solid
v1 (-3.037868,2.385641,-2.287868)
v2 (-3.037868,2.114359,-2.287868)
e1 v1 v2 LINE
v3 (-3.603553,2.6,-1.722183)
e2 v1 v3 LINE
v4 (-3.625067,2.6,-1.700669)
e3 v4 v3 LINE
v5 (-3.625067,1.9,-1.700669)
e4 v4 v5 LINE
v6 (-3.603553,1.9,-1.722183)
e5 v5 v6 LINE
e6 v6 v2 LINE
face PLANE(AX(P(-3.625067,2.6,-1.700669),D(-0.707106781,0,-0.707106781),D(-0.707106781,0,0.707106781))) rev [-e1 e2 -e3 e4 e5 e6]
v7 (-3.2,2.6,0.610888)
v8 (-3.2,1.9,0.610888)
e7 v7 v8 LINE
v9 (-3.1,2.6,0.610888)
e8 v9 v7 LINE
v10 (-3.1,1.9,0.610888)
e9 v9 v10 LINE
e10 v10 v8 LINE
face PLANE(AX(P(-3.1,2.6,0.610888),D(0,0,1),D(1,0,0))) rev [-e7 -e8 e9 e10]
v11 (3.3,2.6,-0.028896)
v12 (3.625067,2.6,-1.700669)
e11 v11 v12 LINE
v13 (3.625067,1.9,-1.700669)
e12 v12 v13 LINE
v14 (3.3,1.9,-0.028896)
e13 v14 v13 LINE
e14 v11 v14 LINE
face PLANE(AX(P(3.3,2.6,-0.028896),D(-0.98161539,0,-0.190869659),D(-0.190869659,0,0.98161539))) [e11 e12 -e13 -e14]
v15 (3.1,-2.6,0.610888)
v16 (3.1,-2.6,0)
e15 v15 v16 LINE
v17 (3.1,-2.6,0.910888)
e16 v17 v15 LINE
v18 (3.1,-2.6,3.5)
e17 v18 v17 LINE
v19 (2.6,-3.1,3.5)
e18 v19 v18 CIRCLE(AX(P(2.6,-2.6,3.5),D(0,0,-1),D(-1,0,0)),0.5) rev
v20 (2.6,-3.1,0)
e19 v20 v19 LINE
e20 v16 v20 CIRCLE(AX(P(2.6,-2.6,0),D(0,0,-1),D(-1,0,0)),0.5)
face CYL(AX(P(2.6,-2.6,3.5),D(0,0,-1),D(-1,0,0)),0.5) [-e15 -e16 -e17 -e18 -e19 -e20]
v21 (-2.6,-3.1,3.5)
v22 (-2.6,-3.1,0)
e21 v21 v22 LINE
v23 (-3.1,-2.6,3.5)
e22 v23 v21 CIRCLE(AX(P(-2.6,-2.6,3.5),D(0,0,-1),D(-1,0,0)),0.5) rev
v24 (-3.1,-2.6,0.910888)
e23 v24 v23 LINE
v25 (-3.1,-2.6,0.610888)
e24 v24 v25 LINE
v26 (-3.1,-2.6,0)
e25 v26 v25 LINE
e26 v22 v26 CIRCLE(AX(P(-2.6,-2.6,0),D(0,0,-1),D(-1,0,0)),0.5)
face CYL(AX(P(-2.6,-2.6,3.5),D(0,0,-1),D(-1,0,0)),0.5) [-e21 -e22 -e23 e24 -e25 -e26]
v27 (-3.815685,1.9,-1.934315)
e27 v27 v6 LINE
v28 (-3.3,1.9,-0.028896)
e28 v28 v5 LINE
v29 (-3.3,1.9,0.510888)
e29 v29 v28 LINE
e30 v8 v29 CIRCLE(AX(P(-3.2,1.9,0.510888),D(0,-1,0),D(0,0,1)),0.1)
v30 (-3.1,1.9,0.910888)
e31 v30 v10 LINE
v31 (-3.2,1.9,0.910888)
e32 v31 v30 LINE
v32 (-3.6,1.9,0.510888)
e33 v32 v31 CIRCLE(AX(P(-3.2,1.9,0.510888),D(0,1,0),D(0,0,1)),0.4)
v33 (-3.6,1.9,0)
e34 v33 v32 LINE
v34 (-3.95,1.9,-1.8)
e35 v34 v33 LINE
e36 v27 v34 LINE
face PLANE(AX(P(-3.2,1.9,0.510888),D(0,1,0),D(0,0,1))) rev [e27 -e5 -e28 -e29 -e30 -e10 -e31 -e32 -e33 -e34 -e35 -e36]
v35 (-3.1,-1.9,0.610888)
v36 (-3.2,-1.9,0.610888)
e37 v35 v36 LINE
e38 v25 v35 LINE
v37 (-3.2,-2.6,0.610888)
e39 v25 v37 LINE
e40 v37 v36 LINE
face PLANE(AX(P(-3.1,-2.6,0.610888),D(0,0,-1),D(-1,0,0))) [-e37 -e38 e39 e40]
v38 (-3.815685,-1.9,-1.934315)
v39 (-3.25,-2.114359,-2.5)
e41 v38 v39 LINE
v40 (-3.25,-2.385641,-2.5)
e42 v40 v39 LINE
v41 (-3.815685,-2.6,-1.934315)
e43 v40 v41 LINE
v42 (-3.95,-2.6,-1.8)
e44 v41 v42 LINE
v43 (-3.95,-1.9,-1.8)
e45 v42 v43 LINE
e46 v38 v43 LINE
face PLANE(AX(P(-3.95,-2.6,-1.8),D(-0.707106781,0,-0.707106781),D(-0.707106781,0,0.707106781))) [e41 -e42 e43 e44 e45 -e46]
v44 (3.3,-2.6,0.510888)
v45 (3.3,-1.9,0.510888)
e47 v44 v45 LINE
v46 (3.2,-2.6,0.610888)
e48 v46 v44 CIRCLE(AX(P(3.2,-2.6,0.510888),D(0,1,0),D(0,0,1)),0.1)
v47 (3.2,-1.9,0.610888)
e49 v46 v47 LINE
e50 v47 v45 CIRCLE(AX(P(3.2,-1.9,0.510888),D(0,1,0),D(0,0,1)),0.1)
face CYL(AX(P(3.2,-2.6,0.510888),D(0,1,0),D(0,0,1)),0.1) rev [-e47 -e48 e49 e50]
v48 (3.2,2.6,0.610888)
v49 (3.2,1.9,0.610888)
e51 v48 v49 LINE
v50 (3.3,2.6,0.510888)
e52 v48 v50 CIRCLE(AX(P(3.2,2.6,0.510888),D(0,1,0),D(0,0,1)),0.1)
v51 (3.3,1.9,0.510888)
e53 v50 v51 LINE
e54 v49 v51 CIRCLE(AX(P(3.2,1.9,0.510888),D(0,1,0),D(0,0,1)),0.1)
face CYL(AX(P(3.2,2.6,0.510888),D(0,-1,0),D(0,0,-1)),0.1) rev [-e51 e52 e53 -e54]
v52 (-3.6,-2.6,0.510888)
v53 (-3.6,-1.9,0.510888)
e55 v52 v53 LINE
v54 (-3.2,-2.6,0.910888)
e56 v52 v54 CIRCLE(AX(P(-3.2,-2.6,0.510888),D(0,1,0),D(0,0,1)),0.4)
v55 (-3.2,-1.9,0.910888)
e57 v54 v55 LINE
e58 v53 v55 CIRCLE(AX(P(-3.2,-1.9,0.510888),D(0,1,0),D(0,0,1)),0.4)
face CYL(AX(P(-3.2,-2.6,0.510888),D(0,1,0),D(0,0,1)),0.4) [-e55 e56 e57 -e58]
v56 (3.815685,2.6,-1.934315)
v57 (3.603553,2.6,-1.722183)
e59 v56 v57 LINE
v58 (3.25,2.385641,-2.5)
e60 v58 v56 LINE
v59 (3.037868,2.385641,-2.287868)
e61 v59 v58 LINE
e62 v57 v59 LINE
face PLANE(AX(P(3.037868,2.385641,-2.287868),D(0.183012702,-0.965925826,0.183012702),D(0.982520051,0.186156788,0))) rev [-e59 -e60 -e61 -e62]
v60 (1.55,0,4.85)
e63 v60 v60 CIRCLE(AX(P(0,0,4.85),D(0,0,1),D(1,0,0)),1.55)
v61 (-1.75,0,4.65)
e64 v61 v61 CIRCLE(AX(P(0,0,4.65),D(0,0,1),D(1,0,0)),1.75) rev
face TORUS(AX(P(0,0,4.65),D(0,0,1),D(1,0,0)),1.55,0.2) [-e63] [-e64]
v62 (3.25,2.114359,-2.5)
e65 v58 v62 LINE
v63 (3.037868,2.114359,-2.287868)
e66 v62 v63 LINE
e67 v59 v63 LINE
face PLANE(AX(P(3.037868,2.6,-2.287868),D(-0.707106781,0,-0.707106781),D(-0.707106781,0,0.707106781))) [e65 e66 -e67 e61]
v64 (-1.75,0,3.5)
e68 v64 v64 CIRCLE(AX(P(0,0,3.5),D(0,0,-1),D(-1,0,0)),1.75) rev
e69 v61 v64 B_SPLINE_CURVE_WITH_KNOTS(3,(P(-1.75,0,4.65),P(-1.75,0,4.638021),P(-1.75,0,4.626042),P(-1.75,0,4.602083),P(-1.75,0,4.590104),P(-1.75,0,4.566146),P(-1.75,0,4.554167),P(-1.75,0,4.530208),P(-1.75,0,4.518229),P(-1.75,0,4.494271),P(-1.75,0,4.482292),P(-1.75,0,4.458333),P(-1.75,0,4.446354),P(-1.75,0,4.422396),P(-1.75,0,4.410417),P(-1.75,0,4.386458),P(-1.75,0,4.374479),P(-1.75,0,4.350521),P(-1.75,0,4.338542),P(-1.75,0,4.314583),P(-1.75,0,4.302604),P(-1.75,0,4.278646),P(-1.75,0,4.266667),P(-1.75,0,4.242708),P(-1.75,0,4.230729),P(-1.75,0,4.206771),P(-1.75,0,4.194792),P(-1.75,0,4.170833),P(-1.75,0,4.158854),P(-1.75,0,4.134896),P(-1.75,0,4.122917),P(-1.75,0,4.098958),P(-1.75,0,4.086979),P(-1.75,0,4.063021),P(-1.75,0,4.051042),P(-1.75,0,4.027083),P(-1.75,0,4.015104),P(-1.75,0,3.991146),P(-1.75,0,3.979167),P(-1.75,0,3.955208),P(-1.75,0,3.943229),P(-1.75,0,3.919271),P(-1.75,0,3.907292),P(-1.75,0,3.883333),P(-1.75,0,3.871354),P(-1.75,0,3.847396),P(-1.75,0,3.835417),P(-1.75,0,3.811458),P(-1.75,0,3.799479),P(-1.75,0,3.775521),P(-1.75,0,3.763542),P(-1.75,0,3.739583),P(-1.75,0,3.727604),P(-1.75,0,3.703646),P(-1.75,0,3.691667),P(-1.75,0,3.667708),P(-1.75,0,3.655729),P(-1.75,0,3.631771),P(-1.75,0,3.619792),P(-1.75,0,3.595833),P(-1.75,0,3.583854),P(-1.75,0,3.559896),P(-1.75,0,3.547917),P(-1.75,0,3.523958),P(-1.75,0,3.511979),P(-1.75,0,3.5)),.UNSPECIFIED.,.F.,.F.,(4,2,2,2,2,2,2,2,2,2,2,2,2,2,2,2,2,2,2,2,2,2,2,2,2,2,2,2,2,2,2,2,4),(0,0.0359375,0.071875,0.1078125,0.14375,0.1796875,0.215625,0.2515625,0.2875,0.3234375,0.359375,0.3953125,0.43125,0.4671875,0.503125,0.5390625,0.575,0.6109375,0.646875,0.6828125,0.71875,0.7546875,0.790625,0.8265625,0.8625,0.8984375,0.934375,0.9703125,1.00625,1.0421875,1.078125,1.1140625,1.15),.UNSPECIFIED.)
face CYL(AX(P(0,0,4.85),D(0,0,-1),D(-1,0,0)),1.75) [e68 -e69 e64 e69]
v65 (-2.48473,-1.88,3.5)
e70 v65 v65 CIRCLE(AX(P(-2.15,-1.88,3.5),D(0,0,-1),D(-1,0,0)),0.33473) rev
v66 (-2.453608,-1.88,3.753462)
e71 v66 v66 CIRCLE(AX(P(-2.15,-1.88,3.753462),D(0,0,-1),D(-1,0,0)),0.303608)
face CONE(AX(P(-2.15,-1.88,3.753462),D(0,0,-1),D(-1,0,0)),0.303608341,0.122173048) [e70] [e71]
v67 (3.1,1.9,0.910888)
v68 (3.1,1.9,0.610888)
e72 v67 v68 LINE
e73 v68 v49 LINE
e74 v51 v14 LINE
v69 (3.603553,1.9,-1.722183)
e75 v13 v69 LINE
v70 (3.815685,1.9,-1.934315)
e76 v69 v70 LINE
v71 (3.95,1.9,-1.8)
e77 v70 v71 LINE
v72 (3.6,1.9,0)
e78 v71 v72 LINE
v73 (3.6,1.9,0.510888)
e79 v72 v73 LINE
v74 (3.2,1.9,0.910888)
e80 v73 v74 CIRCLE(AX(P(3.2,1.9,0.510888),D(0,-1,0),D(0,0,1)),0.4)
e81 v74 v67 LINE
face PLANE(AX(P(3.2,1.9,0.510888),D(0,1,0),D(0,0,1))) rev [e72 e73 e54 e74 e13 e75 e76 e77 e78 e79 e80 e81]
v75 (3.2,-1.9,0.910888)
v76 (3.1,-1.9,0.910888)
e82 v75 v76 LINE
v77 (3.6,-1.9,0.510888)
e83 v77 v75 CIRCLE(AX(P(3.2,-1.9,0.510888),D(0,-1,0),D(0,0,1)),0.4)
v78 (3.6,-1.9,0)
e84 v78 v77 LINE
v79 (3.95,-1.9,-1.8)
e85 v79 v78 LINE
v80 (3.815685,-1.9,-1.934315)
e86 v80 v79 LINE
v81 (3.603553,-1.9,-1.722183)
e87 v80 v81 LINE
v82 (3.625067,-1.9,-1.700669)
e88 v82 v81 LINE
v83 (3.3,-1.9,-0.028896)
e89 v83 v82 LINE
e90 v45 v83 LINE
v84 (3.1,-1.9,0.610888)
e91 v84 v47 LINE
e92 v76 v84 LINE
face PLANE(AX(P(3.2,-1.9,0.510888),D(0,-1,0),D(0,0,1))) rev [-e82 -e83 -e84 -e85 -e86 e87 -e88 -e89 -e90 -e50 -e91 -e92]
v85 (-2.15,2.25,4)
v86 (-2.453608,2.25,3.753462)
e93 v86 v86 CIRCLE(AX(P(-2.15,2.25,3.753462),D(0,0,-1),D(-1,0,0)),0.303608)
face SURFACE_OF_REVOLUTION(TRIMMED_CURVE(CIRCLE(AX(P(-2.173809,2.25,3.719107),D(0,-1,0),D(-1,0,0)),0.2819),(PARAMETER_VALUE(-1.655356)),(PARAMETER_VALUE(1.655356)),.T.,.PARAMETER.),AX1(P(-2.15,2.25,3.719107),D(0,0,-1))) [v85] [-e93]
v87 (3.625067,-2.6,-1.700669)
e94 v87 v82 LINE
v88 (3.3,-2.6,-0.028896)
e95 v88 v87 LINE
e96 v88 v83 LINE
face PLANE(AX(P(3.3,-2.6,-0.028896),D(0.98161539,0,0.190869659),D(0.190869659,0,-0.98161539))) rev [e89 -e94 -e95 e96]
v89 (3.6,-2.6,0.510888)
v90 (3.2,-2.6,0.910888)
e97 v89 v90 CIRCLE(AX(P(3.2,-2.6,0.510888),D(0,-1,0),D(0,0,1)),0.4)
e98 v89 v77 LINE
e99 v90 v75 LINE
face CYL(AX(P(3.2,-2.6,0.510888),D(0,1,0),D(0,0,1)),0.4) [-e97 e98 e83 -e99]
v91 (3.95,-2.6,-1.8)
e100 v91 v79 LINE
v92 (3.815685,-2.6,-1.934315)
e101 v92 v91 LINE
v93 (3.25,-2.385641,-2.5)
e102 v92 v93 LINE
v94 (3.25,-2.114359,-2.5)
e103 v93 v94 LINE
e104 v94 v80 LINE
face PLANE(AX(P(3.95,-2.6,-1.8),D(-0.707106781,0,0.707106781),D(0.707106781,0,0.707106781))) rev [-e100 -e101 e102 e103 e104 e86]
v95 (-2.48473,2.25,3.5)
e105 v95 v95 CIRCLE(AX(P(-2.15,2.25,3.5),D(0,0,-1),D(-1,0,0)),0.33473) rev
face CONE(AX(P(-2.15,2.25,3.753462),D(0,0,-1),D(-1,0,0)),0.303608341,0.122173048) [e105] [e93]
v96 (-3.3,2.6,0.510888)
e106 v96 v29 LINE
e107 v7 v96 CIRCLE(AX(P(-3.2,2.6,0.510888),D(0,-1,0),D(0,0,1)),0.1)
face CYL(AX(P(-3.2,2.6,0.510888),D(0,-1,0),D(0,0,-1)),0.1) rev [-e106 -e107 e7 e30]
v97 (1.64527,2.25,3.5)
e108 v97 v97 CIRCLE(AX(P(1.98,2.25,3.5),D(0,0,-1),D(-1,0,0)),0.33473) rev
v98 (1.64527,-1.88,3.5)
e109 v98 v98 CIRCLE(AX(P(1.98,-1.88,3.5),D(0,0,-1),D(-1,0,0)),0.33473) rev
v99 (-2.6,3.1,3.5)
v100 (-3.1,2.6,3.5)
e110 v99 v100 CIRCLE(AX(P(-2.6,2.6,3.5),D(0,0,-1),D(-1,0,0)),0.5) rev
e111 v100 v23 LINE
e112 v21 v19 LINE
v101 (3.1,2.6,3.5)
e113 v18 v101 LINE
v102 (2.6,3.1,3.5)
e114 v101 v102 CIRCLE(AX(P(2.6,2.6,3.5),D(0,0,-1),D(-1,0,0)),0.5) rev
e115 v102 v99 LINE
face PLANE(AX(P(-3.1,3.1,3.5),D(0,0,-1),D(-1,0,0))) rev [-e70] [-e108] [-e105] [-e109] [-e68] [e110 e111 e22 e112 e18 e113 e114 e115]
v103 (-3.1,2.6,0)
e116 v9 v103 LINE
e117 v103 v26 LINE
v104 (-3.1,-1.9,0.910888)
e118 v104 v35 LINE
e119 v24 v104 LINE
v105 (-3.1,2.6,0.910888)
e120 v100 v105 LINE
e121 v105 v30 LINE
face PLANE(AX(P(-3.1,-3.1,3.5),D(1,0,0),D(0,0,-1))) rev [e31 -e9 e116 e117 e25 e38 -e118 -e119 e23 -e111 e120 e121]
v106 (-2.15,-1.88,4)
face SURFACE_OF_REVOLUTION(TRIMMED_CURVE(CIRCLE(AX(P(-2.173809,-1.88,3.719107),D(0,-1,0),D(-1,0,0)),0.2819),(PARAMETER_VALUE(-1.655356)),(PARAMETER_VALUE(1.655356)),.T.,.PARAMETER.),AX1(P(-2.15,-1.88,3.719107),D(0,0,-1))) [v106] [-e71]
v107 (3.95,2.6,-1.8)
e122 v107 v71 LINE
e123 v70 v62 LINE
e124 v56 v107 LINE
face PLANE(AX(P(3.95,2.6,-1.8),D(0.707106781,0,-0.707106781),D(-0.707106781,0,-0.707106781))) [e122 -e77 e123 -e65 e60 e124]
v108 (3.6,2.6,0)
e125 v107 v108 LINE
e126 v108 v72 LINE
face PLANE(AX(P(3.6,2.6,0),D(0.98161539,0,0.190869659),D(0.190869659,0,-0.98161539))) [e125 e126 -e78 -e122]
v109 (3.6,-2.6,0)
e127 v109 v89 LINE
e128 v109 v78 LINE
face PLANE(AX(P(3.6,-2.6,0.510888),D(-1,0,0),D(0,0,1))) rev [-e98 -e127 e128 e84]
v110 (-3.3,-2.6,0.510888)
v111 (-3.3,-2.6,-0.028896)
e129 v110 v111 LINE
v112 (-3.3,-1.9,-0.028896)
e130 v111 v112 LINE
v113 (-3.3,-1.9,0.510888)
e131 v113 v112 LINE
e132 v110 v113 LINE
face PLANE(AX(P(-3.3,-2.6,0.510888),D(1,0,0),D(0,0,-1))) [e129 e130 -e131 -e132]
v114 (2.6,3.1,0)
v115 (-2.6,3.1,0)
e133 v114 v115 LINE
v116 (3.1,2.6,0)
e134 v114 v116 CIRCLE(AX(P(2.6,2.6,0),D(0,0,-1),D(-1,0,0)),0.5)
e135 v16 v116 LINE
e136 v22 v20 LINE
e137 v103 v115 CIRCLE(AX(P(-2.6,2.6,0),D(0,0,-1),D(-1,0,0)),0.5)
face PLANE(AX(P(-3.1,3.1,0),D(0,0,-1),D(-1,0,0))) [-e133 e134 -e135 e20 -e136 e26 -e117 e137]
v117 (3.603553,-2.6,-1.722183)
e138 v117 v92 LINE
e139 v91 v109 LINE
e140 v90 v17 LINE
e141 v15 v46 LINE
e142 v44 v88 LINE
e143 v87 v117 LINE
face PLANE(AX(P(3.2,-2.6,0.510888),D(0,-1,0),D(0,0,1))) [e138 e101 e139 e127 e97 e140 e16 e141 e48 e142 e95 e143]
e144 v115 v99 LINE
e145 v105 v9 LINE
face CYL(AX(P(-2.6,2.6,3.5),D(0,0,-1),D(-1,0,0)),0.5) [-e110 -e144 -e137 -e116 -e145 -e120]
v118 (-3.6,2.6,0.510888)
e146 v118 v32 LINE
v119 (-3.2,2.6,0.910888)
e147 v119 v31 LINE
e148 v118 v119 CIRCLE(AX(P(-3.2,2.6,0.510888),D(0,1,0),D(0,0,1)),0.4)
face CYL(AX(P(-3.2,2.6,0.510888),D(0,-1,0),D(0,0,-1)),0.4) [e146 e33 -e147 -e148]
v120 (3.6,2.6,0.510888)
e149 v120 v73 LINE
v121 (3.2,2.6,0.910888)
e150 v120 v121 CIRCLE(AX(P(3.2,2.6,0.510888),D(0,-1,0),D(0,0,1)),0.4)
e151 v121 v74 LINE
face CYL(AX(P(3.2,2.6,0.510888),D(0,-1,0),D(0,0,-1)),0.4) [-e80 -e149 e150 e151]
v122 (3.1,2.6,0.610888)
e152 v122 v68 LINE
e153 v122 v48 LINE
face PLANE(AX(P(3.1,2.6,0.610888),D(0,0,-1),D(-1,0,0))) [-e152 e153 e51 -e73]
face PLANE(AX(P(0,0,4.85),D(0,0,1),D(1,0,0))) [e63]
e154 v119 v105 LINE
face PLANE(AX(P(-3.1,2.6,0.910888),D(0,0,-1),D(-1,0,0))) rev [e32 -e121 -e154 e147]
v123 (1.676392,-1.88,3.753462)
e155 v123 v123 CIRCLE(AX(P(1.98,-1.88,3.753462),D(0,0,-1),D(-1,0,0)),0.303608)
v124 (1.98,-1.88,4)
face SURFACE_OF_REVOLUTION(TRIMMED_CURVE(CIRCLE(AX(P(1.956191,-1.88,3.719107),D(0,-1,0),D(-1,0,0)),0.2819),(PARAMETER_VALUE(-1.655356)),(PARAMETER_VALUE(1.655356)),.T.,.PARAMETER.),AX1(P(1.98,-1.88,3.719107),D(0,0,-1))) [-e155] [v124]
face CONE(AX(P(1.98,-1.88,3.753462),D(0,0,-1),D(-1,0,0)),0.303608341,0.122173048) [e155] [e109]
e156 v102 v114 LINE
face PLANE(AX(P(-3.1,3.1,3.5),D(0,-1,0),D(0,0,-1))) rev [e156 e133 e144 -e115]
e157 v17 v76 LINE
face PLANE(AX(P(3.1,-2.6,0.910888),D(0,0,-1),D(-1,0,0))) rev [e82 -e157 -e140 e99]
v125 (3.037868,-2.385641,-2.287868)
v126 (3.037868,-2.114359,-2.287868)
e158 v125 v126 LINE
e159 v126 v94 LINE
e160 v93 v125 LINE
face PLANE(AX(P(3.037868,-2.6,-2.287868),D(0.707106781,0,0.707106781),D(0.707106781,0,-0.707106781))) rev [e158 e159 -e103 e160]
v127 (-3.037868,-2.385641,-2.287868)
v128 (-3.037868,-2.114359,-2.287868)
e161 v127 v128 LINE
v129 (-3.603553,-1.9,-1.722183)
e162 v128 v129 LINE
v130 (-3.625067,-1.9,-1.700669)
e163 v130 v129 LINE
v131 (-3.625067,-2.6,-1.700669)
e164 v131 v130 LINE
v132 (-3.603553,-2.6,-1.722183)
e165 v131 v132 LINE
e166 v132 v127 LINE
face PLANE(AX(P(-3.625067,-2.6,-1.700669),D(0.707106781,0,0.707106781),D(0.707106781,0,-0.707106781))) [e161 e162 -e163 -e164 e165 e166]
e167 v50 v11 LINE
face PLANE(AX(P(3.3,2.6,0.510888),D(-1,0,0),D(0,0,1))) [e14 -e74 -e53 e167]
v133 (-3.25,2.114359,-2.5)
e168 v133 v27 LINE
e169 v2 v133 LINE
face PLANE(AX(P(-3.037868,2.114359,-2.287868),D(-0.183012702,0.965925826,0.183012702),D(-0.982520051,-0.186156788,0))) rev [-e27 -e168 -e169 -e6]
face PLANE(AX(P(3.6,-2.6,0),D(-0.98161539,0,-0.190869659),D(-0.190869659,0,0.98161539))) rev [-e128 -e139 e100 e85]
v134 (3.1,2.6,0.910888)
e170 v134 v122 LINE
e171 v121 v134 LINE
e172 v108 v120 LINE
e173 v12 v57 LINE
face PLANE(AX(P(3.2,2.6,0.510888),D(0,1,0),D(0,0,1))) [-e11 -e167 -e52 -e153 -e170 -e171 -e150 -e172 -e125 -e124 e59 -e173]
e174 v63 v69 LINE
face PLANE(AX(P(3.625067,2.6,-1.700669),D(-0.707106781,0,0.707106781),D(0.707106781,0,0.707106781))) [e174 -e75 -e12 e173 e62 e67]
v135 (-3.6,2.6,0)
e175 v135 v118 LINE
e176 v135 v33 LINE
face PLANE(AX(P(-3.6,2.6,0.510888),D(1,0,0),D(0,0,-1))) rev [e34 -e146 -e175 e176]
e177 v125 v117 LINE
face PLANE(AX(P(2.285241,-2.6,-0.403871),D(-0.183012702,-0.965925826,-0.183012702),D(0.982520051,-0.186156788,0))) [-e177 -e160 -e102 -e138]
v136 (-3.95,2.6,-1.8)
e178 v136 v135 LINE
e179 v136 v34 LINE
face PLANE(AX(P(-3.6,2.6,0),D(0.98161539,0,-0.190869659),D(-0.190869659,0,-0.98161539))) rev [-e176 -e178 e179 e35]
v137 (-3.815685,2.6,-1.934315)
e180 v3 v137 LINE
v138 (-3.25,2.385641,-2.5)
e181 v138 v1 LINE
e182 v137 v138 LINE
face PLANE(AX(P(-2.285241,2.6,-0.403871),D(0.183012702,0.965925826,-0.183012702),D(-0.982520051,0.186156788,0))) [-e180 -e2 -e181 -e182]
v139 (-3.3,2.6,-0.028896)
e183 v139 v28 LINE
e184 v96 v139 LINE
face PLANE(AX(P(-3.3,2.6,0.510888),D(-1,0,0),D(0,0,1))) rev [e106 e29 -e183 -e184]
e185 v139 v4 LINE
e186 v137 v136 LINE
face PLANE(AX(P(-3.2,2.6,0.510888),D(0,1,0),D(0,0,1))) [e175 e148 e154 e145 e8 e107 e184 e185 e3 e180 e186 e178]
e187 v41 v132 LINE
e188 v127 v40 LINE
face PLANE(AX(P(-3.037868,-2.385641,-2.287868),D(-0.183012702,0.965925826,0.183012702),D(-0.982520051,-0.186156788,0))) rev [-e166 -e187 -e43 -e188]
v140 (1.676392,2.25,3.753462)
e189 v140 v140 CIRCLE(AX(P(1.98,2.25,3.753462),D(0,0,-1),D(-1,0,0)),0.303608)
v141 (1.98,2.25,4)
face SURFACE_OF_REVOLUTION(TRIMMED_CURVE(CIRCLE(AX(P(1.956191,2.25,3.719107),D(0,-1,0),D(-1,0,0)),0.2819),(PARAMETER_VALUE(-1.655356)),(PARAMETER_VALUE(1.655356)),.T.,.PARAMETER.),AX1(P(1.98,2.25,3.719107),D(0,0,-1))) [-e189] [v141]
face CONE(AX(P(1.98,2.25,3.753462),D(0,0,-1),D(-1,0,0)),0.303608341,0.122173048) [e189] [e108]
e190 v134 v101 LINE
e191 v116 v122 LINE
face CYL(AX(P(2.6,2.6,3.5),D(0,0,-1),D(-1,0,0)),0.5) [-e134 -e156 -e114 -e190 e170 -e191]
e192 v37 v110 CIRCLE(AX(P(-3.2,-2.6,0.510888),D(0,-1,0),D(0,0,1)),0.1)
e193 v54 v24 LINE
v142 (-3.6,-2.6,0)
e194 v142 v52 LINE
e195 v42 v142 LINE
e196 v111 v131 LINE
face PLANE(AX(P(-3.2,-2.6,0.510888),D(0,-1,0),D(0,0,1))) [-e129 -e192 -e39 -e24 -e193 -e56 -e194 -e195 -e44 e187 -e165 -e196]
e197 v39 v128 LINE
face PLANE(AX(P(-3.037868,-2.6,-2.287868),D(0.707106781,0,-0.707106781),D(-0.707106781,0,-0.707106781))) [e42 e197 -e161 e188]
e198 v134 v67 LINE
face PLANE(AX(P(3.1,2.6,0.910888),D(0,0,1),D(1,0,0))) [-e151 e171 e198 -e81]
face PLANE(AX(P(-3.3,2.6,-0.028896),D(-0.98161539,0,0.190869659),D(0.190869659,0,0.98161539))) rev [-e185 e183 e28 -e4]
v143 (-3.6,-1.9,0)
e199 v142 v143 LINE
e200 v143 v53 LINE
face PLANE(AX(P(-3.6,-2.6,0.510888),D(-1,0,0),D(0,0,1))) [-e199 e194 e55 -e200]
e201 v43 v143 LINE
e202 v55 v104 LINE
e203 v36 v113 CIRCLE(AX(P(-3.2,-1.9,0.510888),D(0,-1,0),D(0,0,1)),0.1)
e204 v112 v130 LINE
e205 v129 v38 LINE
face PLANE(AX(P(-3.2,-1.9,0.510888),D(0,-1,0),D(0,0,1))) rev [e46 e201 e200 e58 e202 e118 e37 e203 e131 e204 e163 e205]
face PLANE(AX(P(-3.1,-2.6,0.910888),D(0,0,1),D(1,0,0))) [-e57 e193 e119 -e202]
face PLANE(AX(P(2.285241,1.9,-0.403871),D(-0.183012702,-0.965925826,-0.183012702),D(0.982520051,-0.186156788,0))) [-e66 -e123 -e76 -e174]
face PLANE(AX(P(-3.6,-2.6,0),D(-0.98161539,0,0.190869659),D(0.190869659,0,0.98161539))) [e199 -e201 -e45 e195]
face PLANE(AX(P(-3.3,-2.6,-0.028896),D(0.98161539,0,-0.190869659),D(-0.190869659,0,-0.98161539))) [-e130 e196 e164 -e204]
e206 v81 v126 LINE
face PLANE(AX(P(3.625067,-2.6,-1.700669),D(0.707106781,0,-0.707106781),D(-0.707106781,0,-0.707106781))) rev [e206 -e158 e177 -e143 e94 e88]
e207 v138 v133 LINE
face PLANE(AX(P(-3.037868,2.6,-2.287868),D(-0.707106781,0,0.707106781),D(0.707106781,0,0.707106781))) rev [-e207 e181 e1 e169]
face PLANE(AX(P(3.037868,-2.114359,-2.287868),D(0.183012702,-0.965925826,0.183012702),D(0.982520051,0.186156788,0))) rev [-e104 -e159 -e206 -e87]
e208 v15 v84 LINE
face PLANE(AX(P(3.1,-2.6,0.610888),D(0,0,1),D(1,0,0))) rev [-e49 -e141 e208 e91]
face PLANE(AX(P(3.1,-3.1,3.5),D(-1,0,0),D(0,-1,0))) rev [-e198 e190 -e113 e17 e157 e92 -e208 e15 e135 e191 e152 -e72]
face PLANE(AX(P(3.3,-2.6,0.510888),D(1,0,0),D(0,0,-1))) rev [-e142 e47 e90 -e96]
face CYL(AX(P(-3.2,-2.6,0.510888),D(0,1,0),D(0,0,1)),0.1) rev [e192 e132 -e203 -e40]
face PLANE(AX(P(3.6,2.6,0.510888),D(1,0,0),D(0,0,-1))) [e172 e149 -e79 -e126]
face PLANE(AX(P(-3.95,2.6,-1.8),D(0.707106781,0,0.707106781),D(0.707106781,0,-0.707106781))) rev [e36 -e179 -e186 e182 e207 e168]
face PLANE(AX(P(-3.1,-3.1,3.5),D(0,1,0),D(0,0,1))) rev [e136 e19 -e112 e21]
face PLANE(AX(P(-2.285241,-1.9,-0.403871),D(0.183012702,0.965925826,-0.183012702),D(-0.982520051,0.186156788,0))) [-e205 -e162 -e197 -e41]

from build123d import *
from OCP.BRepFilletAPI import BRepFilletAPI_MakeChamfer

# Parameters (mm, degrees)
SKETCH1_W                 = 6.2
SKETCH1_H                 = 6.2
EXTRUDE1_DEPTH            = 3.5
SKETCH2_R                 = 1.75
EXTRUDE2_DEPTH            = 1.35
LPATTERN1_COUNT           = 2
LPATTERN1_PITCH           = 4.13
LPATTERN1_COUNT_DIR2      = 2
LPATTERN1_PITCH_DIR2      = 4.13
FILLET1_R                 = 0.5
FILLET2_R                 = 0.2
EXTRUDE3_DEPTH            = 0.35
CHAMFER1_SIZE             = 0.8
CHAMFER1_SIZE2            = 0.214359354
CHAMFER1_OF_MIRROR1_SIZE  = 0.8
CHAMFER1_OF_MIRROR1_SIZE2 = 0.214359354
MIRROR2_START             = -2.6
MIRROR2_DEPTH             = 0.7
MIRROR2_START_2           = 1.9
MIRROR2_2_DEPTH           = 0.7
MIRROR2_START_3           = 3.765863992
MIRROR2_3_DEPTH           = 0.3


with BuildPart() as part:
    # Sketch1 → Extrude1 (new body)
    with BuildSketch(Plane.XY):
        Rectangle(SKETCH1_W, SKETCH1_H)
    extrude(amount=EXTRUDE1_DEPTH)

    # Sketch2 → Extrude2 (add)
    with BuildSketch(Plane.XY.offset(3.5)):
        with Locations(Location((0, 0, 0), (0, 0, 180))):
            Circle(SKETCH2_R)
    extrude(amount=EXTRUDE2_DEPTH)

    # Sketch4 → Revolve1 (revolve)
    with BuildSketch(Plane(origin=(0, 2.25, 0), x_dir=(-1, 0, 0), z_dir=(0, 1, 0)), mode=Mode.PRIVATE) as revolve1_sk:
        with BuildLine():
            Line((1.815270458, 3.5), (2.15, 3.5))
            Line((2.15, 3.5), (2.15, 4))
            ThreePointArc((2.15, 4), (1.948488877, 3.937944347), (1.846391659, 3.753461841))
            Line((1.846391659, 3.753461841), (1.815270458, 3.5))
        make_face()
    revolve1 = revolve(revolve1_sk.sketch.rotate(Axis((-2.15, 2.25, 2.844368125), (0, 0, 1)), 180), axis=Axis((-2.15, 2.25, 2.844368125), (0, 0, 1)))

    # LPattern1: Revolve1 2 × 2
    with Locations(*[(i * LPATTERN1_PITCH, -j * LPATTERN1_PITCH_DIR2, 0) for i in range(LPATTERN1_COUNT) for j in range(LPATTERN1_COUNT_DIR2) if (i, j) != (0, 0)]):
        add(revolve1)

    # Fillet1
    fillet1_edges = [part.edges().sort_by_distance(p)[0] for p in [
        (-3.1, 3.1, 1.75),
        (3.1, 3.1, 1.75),
        (3.1, -3.1, 1.75),
        (-3.1, -3.1, 1.75),
    ]]
    fillet(fillet1_edges, radius=FILLET1_R)

    # Fillet2
    fillet2_edges = [part.edges().sort_by_distance(p)[0] for p in [
        (1.75, 0, 4.85),
    ]]
    fillet(fillet2_edges, radius=FILLET2_R)

    # Sketch5 → Extrude3 (add, symmetric)
    with BuildSketch(Plane(origin=(0, 2.25, 0), x_dir=(-1, 0, 0), z_dir=(0, 1, 0))):
        with BuildLine():
            Line((3.1, 0.91088803), (3.2, 0.91088803))
            ThreePointArc((3.2, 0.91088803), (3.482842712, 0.793730742), (3.6, 0.51088803))
            Line((3.6, 0.51088803), (3.6, 0))
            Line((3.6, 0), (3.95, -1.8))
            Line((3.95, -1.8), (3.25, -2.5))
            Line((3.25, -2.5), (3.037867966, -2.287867966))
            Line((3.037867966, -2.287867966), (3.625066954, -1.700668977))
            Line((3.625066954, -1.700668977), (3.3, -0.02889607))
            Line((3.3, -0.02889607), (3.3, 0.51088803))
            ThreePointArc((3.3, 0.51088803), (3.270710678, 0.581598708), (3.2, 0.61088803))
            Line((3.2, 0.61088803), (3.1, 0.61088803))
            Line((3.1, 0.61088803), (3.1, 0.91088803))
        make_face()
    extrude3 = extrude(amount=EXTRUDE3_DEPTH, both=True)

    # Chamfer1: one chamfer whose edges measure the first distance from different faces: ONE call of the kernel's chamfer builder (chamfer() names one face for all edges)
    chamfer1_edges_1 = [part.edges().sort_by_distance(p)[0] for p in [
        (-3.143933983, 1.9, -2.393933983),
    ]]
    chamfer1_side_1 = [part.faces().sort_by_distance(p)[0] for p in [
        (-3.520562137, 1.9, -0.80393009),
    ]]
    chamfer1_edges_2 = [part.edges().sort_by_distance(p)[0] for p in [
        (-3.143933983, 2.6, -2.393933983),
    ]]
    chamfer1_side_2 = [part.faces().sort_by_distance(p)[0] for p in [
        (-3.520562137, 2.6, -0.80393009),
    ]]
    chamfer1 = BRepFilletAPI_MakeChamfer(part.part.solid().wrapped)
    for e in chamfer1_edges_1:
        chamfer1.Add(CHAMFER1_SIZE, CHAMFER1_SIZE2, e.wrapped, chamfer1_side_1[0].wrapped)  # the first distance lies on this face
    for e in chamfer1_edges_2:
        chamfer1.Add(CHAMFER1_SIZE, CHAMFER1_SIZE2, e.wrapped, chamfer1_side_2[0].wrapped)  # the first distance lies on this face
    add(Compound.cast(chamfer1.Shape()), mode=Mode.REPLACE)

    # Mirror1: Extrude3 across plane
    add(extrude3.mirror(Plane.ZX))

    # Chamfer1 of Mirror1: one chamfer whose edges measure the first distance from different faces: ONE call of the kernel's chamfer builder (chamfer() names one face for all edges)
    chamfer1_of_mirror1_edges_1 = [part.edges().sort_by_distance(p)[0] for p in [
        (-3.143933983, -1.9, -2.393933983),
    ]]
    chamfer1_of_mirror1_side_1 = [part.faces().sort_by_distance(p)[0] for p in [
        (-3.520562137, -1.9, -0.80393009),
    ]]
    chamfer1_of_mirror1_edges_2 = [part.edges().sort_by_distance(p)[0] for p in [
        (-3.143933983, -2.6, -2.393933983),
    ]]
    chamfer1_of_mirror1_side_2 = [part.faces().sort_by_distance(p)[0] for p in [
        (-3.520562137, -2.6, -0.80393009),
    ]]
    chamfer1_of_mirror1 = BRepFilletAPI_MakeChamfer(part.part.solid().wrapped)
    for e in chamfer1_of_mirror1_edges_1:
        chamfer1_of_mirror1.Add(CHAMFER1_OF_MIRROR1_SIZE, CHAMFER1_OF_MIRROR1_SIZE2, e.wrapped, chamfer1_of_mirror1_side_1[0].wrapped)  # the first distance lies on this face
    for e in chamfer1_of_mirror1_edges_2:
        chamfer1_of_mirror1.Add(CHAMFER1_OF_MIRROR1_SIZE, CHAMFER1_OF_MIRROR1_SIZE2, e.wrapped, chamfer1_of_mirror1_side_2[0].wrapped)  # the first distance lies on this face
    add(Compound.cast(chamfer1_of_mirror1.Shape()), mode=Mode.REPLACE)

    # Mirror2: read off the stored shape, not the designer's step
    # Mirror2 outline → Mirror2 (add)
    with BuildSketch(Plane(origin=(0, 0, 0), x_dir=(1, 0, 0), z_dir=(0, 1, 0)).offset(MIRROR2_START)):
        with BuildLine():
            ThreePointArc((3.3, -0.51088803), (3.270710678, -0.581598708), (3.2, -0.61088803))
            Line((3.2, -0.61088803), (3.1, -0.61088803))
            Line((3.1, -0.61088803), (3.1, -0.91088803))
            Line((3.1, -0.91088803), (3.2, -0.91088803))
            ThreePointArc((3.2, -0.91088803), (3.482842712, -0.793730742), (3.6, -0.51088803))
            Line((3.6, -0.51088803), (3.6, 0))
            Line((3.6, 0), (3.95, 1.8))
            Line((3.95, 1.8), (3.25, 2.5))
            Line((3.25, 2.5), (3.037867966, 2.287867966))
            Line((3.037867966, 2.287867966), (3.625066954, 1.700668977))
            Line((3.625066954, 1.700668977), (3.3, 0.02889607))
            Line((3.3, 0.02889607), (3.3, -0.51088803))
        make_face()
    extrude(amount=MIRROR2_DEPTH)

    # Mirror2 2 outline → Mirror2 2 (add)
    with BuildSketch(Plane(origin=(0, 0, 0), x_dir=(1, 0, 0), z_dir=(0, 1, 0)).offset(MIRROR2_START_2)):
        with BuildLine():
            ThreePointArc((3.3, -0.51088803), (3.270710678, -0.581598708), (3.2, -0.61088803))
            Line((3.2, -0.61088803), (3.1, -0.61088803))
            Line((3.1, -0.61088803), (3.1, -0.91088803))
            Line((3.1, -0.91088803), (3.2, -0.91088803))
            ThreePointArc((3.2, -0.91088803), (3.482842712, -0.793730742), (3.6, -0.51088803))
            Line((3.6, -0.51088803), (3.6, 0))
            Line((3.6, 0), (3.95, 1.8))
            Line((3.95, 1.8), (3.25, 2.5))
            Line((3.25, 2.5), (3.037867966, 2.287867966))
            Line((3.037867966, 2.287867966), (3.625066954, 1.700668977))
            Line((3.625066954, 1.700668977), (3.3, 0.02889607))
            Line((3.3, 0.02889607), (3.3, -0.51088803))
        make_face()
    extrude(amount=MIRROR2_2_DEPTH)

    # Mirror2 3 outline → Mirror2 3 (cut)
    with BuildSketch(Plane(origin=(0, 0, 0), x_dir=(0.7071067811865487, 0, 0.7071067811865464), z_dir=(0.7071067811865465, 0, -0.7071067811865485)).offset(MIRROR2_START_3)):
        Polygon((0.530330086, -2.6), (1.330330086, -2.6), (0.530330086, -2.385640646), align=None)
        Polygon((0.530330086, -1.9), (0.530330086, -2.114359354), (1.330330086, -1.9), align=None)
        Polygon((1.330330086, 1.9), (0.530330086, 2.114359354), (0.530330086, 1.9), align=None)
        Polygon((0.530330086, 2.385640646), (1.330330086, 2.6), (0.530330086, 2.6), align=None)
    extrude(amount=MIRROR2_3_DEPTH, mode=Mode.SUBTRACT)


solid = part.part
